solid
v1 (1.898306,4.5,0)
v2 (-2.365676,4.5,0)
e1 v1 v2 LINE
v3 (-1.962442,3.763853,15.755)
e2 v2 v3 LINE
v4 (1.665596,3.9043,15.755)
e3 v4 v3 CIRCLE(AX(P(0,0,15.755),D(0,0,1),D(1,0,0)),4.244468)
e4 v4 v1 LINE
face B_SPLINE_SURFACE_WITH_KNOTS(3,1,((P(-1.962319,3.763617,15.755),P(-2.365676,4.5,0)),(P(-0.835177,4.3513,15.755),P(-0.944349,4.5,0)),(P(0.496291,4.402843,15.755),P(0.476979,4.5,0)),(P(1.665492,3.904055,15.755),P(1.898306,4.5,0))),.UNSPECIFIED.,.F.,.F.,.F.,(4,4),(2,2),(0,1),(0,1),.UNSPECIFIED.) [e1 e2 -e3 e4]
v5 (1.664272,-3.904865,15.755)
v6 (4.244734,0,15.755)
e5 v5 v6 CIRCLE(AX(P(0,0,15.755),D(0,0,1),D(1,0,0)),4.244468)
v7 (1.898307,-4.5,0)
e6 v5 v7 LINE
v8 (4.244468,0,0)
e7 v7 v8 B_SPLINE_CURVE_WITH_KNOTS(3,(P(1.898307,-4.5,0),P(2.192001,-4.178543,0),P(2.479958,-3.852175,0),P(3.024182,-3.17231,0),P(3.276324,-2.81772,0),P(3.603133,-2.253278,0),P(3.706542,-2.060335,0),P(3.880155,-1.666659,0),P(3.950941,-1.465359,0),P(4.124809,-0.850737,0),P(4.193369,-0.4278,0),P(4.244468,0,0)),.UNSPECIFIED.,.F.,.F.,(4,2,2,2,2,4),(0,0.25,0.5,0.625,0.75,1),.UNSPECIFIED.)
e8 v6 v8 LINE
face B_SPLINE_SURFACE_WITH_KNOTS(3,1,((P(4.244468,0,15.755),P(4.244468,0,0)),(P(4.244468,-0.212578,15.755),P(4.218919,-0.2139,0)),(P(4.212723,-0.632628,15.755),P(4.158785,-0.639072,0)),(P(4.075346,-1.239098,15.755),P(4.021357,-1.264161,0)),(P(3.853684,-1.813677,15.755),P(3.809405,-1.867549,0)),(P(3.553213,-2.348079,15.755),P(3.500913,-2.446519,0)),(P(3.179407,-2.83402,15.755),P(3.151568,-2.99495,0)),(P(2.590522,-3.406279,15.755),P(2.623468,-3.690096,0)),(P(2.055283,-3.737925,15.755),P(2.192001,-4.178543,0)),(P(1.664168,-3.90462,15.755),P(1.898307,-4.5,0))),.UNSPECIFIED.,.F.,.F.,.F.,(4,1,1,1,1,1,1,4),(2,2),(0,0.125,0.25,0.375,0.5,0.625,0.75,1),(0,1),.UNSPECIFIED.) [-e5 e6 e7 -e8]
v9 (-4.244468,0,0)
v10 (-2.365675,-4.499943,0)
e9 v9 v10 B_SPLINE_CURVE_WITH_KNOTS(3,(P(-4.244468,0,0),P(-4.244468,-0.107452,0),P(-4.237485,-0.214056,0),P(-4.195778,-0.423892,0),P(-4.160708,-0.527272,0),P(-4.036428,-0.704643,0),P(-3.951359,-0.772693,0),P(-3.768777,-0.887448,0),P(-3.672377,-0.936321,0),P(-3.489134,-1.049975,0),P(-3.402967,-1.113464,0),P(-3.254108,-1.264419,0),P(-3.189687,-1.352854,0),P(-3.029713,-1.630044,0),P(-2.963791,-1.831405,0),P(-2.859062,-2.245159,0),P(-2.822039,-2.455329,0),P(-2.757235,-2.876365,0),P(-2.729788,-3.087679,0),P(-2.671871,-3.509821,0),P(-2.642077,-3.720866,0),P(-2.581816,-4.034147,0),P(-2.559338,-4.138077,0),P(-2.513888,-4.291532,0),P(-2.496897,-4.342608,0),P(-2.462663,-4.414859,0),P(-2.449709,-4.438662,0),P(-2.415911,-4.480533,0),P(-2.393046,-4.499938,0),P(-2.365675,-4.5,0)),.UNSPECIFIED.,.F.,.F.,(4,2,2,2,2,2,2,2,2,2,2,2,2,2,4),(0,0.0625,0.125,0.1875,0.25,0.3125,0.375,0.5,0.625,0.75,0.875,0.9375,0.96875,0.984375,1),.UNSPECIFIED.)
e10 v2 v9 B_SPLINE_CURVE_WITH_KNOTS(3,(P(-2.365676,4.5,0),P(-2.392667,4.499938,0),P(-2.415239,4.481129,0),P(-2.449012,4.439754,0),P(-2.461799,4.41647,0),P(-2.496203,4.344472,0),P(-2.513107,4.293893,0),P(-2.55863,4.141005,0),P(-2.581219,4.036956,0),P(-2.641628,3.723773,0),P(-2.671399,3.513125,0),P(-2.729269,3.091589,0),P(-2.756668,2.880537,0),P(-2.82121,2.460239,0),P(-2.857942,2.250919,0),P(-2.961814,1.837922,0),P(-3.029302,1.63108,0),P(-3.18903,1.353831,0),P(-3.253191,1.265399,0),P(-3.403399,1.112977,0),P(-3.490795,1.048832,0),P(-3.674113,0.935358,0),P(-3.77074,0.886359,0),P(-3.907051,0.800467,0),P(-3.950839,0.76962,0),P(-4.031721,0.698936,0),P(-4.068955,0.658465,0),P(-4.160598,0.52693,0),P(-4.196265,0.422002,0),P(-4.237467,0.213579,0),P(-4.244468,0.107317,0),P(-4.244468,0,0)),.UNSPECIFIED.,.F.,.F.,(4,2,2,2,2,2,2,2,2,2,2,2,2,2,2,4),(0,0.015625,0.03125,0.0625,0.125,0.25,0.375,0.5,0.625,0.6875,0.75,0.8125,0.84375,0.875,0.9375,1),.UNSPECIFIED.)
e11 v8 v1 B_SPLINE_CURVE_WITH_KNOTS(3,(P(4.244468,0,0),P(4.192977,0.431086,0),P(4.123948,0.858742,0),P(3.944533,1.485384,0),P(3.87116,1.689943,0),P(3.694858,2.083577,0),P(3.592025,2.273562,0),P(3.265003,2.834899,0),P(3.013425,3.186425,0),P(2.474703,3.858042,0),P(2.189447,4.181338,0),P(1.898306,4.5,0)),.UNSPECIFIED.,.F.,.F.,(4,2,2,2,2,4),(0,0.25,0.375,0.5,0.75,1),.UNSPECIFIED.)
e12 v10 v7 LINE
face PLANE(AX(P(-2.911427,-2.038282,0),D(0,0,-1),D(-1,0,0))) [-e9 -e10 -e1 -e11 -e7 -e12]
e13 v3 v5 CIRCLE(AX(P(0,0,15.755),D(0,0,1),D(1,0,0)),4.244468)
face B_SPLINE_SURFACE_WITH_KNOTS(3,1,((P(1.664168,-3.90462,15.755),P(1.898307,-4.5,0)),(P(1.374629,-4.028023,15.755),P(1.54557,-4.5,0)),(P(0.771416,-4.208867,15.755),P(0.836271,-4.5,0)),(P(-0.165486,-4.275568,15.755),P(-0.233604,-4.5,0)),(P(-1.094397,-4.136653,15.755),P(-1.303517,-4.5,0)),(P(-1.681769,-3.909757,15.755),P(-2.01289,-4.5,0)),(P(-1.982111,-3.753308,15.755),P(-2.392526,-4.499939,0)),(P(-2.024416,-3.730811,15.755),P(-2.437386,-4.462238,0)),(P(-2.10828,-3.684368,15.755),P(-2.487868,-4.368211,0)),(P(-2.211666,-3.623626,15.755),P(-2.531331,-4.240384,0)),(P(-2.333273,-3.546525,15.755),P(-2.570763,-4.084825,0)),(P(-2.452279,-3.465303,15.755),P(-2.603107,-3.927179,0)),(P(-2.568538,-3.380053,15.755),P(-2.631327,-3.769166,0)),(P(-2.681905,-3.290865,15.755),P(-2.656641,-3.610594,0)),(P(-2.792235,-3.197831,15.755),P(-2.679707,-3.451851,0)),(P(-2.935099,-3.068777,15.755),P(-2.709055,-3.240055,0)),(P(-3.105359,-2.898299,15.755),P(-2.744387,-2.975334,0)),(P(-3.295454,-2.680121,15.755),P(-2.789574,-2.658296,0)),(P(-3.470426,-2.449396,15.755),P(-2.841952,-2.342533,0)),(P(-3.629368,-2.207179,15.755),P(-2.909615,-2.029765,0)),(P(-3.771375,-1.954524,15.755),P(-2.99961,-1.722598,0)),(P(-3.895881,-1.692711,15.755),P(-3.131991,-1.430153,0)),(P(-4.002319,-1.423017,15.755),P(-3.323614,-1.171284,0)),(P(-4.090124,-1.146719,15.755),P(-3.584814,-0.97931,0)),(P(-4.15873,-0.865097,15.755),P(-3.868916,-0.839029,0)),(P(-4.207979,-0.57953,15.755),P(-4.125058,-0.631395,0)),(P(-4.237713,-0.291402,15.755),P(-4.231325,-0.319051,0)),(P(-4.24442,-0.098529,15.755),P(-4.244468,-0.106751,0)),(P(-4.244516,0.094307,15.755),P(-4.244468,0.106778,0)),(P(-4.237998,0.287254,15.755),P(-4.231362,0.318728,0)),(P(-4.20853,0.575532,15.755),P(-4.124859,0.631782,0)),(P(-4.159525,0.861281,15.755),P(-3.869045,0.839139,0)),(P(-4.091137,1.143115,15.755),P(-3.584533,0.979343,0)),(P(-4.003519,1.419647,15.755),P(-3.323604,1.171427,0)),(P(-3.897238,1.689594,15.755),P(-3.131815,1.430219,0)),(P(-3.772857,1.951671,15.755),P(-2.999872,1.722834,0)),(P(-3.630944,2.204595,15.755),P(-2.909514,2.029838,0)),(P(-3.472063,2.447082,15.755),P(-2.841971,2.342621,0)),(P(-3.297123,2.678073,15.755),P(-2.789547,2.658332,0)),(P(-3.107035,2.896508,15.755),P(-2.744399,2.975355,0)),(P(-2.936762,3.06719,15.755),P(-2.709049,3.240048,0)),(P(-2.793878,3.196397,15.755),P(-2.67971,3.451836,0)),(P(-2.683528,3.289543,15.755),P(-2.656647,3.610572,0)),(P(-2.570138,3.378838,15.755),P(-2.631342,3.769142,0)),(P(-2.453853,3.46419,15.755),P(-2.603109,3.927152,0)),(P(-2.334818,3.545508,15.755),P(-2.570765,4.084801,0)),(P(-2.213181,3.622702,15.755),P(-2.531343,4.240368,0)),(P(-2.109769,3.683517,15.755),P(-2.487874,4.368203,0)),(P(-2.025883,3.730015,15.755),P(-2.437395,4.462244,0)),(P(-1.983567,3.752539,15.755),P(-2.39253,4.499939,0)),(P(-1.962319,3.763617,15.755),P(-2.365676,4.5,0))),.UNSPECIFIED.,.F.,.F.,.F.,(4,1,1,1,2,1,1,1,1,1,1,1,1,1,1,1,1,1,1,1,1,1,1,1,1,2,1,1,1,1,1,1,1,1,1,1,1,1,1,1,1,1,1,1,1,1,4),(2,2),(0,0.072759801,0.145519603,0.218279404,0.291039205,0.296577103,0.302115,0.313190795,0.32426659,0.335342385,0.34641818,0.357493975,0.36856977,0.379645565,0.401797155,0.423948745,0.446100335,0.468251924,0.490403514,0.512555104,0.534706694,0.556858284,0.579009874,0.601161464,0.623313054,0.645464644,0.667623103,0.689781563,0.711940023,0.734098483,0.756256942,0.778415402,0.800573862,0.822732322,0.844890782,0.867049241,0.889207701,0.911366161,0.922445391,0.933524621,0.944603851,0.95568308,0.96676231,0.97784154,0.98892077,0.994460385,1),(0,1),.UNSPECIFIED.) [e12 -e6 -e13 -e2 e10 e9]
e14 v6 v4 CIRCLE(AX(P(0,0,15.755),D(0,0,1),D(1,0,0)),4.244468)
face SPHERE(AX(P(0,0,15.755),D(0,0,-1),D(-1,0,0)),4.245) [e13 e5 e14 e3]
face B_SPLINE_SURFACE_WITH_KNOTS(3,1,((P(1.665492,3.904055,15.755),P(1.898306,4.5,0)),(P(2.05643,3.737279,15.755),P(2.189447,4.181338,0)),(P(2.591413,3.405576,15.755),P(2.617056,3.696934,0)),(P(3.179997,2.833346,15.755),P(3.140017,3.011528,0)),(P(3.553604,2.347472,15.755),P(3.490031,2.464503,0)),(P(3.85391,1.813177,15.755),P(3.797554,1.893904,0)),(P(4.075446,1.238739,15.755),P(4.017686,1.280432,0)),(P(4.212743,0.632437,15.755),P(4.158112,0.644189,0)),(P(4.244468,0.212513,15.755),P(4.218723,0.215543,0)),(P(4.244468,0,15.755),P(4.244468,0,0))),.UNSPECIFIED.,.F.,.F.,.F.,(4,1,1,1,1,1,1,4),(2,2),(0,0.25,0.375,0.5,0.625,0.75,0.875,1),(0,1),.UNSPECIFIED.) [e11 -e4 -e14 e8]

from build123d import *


with BuildPart() as part:
    # Loft1: read off the stored shape, not the designer's step
    # Loft1: loft between two sections, ruled curve by curve
    loft1_from = [
        Edge.make_bspline([(-1.962319172, 3.763617386, 15.755), (-0.835177405, 4.351299839, 15.755), (0.496291342, 4.402843001, 15.755), (1.665492002, 3.904055423, 15.755)], [0, 0, 0, 0, 1, 1, 1, 1], 3),
        Edge.make_bspline([(1.665492002, 3.904055423, 15.755), (2.056430126, 3.737279021, 15.755), (2.59141276, 3.405576222, 15.755), (3.179997489, 2.833345855, 15.755), (3.553604224, 2.3474722, 15.755), (3.853910061, 1.813176771, 15.755), (4.075445914, 1.238738673, 15.755), (4.212742694, 0.632437012, 15.755), (4.244468442, 0.212512932, 15.755), (4.244468442, 0, 15.755)], [0, 0, 0, 0, 0.25, 0.375, 0.5, 0.625, 0.75, 0.875, 1, 1, 1, 1], 3),
        Edge.make_bspline([(1.664167638, -3.904620139, 15.755), (1.374629167, -4.02802281, 15.755), (0.77141564, -4.208867018, 15.755), (-0.165486361, -4.275568066, 15.755), (-1.094397344, -4.136652906, 15.755), (-1.681768906, -3.909756812, 15.755), (-1.982110895, -3.753308202, 15.755), (-2.024416049, -3.730811305, 15.755), (-2.108280284, -3.684368394, 15.755), (-2.211666294, -3.623626111, 15.755), (-2.33327339, -3.546524565, 15.755), (-2.452279106, -3.46530324, 15.755), (-2.568538178, -3.380053162, 15.755), (-2.681905343, -3.290865359, 15.755), (-2.792235337, -3.197830857, 15.755), (-2.935098751, -3.068777292, 15.755), (-3.105358774, -2.898298723, 15.755), (-3.295453815, -2.68012129, 15.755), (-3.470425674, -2.449396136, 15.755), (-3.629368156, -2.207178692, 15.755), (-3.771375064, -1.954524388, 15.755), (-3.895880542, -1.692711132, 15.755), (-4.002318735, -1.423016833, 15.755), (-4.090123788, -1.1467194, 15.755), (-4.158729844, -0.86509674, 15.755), (-4.207978814, -0.579530352, 15.755), (-4.237712608, -0.291401732, 15.755), (-4.244419627, -0.098528829, 15.755), (-4.244516208, 0.094307051, 15.755), (-4.237998006, 0.287254116, 15.755), (-4.20853003, 0.575532172, 15.755), (-4.159525106, 0.861281284, 15.755), (-4.091136957, 1.143115051, 15.755), (-4.003519306, 1.41964707, 15.755), (-3.897237614, 1.689593575, 15.755), (-3.77285734, 1.9516708, 15.755), (-3.630943942, 2.204594979, 15.755), (-3.472062881, 2.447082347, 15.755), (-3.297123497, 2.67807316, 15.755), (-3.107035129, 2.896507676, 15.755), (-2.936761787, 3.067189738, 15.755), (-2.793877962, 3.196397497, 15.755), (-2.683528402, 3.289543211, 15.755), (-2.570138037, 3.378837662, 15.755), (-2.45385275, 3.464189692, 15.755), (-2.334818427, 3.545508141, 15.755), (-2.213180952, 3.622701851, 15.755), (-2.109768668, 3.683516696, 15.755), (-2.02588315, 3.730015043, 15.755), (-1.983567317, 3.752538777, 15.755), (-1.962319172, 3.763617386, 15.755)], [0, 0, 0, 0, 0.072759801, 0.145519603, 0.218279404, 0.291039205, 0.291039205, 0.296577103, 0.302115, 0.313190795, 0.32426659, 0.335342385, 0.34641818, 0.357493975, 0.36856977, 0.379645565, 0.401797155, 0.423948745, 0.446100335, 0.468251924, 0.490403514, 0.512555104, 0.534706694, 0.556858284, 0.579009874, 0.601161464, 0.623313054, 0.645464644, 0.645464644, 0.667623103, 0.689781563, 0.711940023, 0.734098483, 0.756256942, 0.778415402, 0.800573862, 0.822732322, 0.844890782, 0.867049241, 0.889207701, 0.911366161, 0.922445391, 0.933524621, 0.944603851, 0.95568308, 0.96676231, 0.97784154, 0.98892077, 0.994460385, 1, 1, 1, 1], 3),
        Edge.make_bspline([(4.244468442, 0, 15.755), (4.244468442, -0.212578268, 15.755), (4.212723402, -0.632628172, 15.755), (4.075345993, -1.239097722, 15.755), (3.853684003, -1.813676557, 15.755), (3.553212703, -2.348079267, 15.755), (3.179407362, -2.834020443, 15.755), (2.590521881, -3.406279419, 15.755), (2.055282519, -3.73792512, 15.755), (1.664167638, -3.904620139, 15.755)], [0, 0, 0, 0, 0.125, 0.25, 0.375, 0.5, 0.625, 0.75, 1, 1, 1, 1], 3),
    ]
    loft1_to = [
        Edge.make_bspline([(-2.365676415, 4.499999845, 0), (-0.944348849, 4.499999897, 0), (0.476978716, 4.499999948, 0), (1.898306282, 4.5, 0)], [0, 0, 0, 0, 1, 1, 1, 1], 3),
        Edge.make_bspline([(1.898306282, 4.5, 0), (2.189447131, 4.181338004, 0), (2.617056266, 3.696934319, 0), (3.140017311, 3.011527507, 0), (3.490030755, 2.464502666, 0), (3.797554208, 1.893903652, 0), (4.017685812, 1.280432396, 0), (4.158112399, 0.644189438, 0), (4.218722694, 0.215543151, 0), (4.244468442, 0, 0)], [0, 0, 0, 0, 0.25, 0.375, 0.5, 0.625, 0.75, 0.875, 1, 1, 1, 1], 3),
        Edge.make_bspline([(1.898306505, -4.5, 0), (1.545570373, -4.499999987, 0), (0.83627143, -4.499999962, 0), (-0.233603527, -4.499999923, 0), (-1.303516633, -4.499999885, 0), (-2.012890493, -4.49999986, 0), (-2.392525615, -4.49993902, 0), (-2.437385534, -4.462238299, 0), (-2.48786808, -4.368210504, 0), (-2.531331418, -4.240383501, 0), (-2.570763128, -4.084824911, 0), (-2.603106974, -3.92717914, 0), (-2.63132738, -3.76916585, 0), (-2.656640522, -3.610594073, 0), (-2.679706833, -3.451850801, 0), (-2.709054574, -3.240055097, 0), (-2.74438696, -2.975334222, 0), (-2.789573992, -2.658296259, 0), (-2.841951747, -2.342532517, 0), (-2.909614883, -2.029765238, 0), (-2.999610008, -1.722597725, 0), (-3.131990684, -1.430152564, 0), (-3.32361371, -1.171283708, 0), (-3.584813685, -0.979310336, 0), (-3.868916222, -0.839029018, 0), (-4.125058102, -0.631394523, 0), (-4.231325129, -0.319051212, 0), (-4.244468442, -0.10675079, 0), (-4.244468442, 0.106777791, 0), (-4.231362096, 0.31872801, 0), (-4.124858543, 0.63178191, 0), (-3.869044863, 0.839139186, 0), (-3.584533188, 0.97934347, 0), (-3.323603912, 1.171426953, 0), (-3.131815088, 1.43021893, 0), (-2.9998723, 1.722834389, 0), (-2.909513573, 2.029838476, 0), (-2.841970931, 2.342621345, 0), (-2.789546837, 2.658331647, 0), (-2.744399421, 2.975354523, 0), (-2.709049012, 3.240048087, 0), (-2.679710196, 3.451835607, 0), (-2.656646522, 3.610571504, 0), (-2.631341988, 3.76914179, 0), (-2.603109371, 3.927151619, 0), (-2.570764877, 4.084800779, 0), (-2.531343119, 4.240367559, 0), (-2.487873684, 4.368202662, 0), (-2.437394512, 4.46224354, 0), (-2.39252965, 4.499938578, 0), (-2.365676415, 4.499999845, 0)], [0, 0, 0, 0, 0.072759801, 0.145519603, 0.218279404, 0.291039205, 0.291039205, 0.296577103, 0.302115, 0.313190795, 0.32426659, 0.335342385, 0.34641818, 0.357493975, 0.36856977, 0.379645565, 0.401797155, 0.423948745, 0.446100335, 0.468251924, 0.490403514, 0.512555104, 0.534706694, 0.556858284, 0.579009874, 0.601161464, 0.623313054, 0.645464644, 0.645464644, 0.667623103, 0.689781563, 0.711940023, 0.734098483, 0.756256942, 0.778415402, 0.800573862, 0.822732322, 0.844890782, 0.867049241, 0.889207701, 0.911366161, 0.922445391, 0.933524621, 0.944603851, 0.95568308, 0.96676231, 0.97784154, 0.98892077, 0.994460385, 1, 1, 1, 1], 3),
        Edge.make_bspline([(4.244468442, 0, 0), (4.218918945, -0.213900205, 0), (4.158784737, -0.639072215, 0), (4.021356681, -1.264160976, 0), (3.809404837, -1.867549468, 0), (3.500913473, -2.44651898, 0), (3.151568065, -2.994950248, 0), (2.623467607, -3.690096431, 0), (2.192000706, -4.178543262, 0), (1.898306505, -4.5, 0)], [0, 0, 0, 0, 0.125, 0.25, 0.375, 0.5, 0.625, 0.75, 1, 1, 1, 1], 3),
    ]
    loft1 = Solid(Shell([*[Face.make_surface_from_curves(loft1_from[k], loft1_to[k]) for k in range(4)], Face(Wire(loft1_from)), Face(Wire(loft1_to))]))
    add(loft1)

    # Sketch4 → Revolve1 (revolve)
    with BuildSketch(Plane(origin=(0, 0, 0), x_dir=(1, 0, 0), z_dir=(0, 1, 0))):
        with BuildLine():
            Line((0, -15.755), (0, -20))
            ThreePointArc((0, -20), (-3.001668286, -18.756668286), (-4.245, -15.755))
            Line((-4.245, -15.755), (0, -15.755))
        make_face()
    revolve(axis=Axis((0, 0, 15.755), (0, 0, 1)))


solid = part.part
